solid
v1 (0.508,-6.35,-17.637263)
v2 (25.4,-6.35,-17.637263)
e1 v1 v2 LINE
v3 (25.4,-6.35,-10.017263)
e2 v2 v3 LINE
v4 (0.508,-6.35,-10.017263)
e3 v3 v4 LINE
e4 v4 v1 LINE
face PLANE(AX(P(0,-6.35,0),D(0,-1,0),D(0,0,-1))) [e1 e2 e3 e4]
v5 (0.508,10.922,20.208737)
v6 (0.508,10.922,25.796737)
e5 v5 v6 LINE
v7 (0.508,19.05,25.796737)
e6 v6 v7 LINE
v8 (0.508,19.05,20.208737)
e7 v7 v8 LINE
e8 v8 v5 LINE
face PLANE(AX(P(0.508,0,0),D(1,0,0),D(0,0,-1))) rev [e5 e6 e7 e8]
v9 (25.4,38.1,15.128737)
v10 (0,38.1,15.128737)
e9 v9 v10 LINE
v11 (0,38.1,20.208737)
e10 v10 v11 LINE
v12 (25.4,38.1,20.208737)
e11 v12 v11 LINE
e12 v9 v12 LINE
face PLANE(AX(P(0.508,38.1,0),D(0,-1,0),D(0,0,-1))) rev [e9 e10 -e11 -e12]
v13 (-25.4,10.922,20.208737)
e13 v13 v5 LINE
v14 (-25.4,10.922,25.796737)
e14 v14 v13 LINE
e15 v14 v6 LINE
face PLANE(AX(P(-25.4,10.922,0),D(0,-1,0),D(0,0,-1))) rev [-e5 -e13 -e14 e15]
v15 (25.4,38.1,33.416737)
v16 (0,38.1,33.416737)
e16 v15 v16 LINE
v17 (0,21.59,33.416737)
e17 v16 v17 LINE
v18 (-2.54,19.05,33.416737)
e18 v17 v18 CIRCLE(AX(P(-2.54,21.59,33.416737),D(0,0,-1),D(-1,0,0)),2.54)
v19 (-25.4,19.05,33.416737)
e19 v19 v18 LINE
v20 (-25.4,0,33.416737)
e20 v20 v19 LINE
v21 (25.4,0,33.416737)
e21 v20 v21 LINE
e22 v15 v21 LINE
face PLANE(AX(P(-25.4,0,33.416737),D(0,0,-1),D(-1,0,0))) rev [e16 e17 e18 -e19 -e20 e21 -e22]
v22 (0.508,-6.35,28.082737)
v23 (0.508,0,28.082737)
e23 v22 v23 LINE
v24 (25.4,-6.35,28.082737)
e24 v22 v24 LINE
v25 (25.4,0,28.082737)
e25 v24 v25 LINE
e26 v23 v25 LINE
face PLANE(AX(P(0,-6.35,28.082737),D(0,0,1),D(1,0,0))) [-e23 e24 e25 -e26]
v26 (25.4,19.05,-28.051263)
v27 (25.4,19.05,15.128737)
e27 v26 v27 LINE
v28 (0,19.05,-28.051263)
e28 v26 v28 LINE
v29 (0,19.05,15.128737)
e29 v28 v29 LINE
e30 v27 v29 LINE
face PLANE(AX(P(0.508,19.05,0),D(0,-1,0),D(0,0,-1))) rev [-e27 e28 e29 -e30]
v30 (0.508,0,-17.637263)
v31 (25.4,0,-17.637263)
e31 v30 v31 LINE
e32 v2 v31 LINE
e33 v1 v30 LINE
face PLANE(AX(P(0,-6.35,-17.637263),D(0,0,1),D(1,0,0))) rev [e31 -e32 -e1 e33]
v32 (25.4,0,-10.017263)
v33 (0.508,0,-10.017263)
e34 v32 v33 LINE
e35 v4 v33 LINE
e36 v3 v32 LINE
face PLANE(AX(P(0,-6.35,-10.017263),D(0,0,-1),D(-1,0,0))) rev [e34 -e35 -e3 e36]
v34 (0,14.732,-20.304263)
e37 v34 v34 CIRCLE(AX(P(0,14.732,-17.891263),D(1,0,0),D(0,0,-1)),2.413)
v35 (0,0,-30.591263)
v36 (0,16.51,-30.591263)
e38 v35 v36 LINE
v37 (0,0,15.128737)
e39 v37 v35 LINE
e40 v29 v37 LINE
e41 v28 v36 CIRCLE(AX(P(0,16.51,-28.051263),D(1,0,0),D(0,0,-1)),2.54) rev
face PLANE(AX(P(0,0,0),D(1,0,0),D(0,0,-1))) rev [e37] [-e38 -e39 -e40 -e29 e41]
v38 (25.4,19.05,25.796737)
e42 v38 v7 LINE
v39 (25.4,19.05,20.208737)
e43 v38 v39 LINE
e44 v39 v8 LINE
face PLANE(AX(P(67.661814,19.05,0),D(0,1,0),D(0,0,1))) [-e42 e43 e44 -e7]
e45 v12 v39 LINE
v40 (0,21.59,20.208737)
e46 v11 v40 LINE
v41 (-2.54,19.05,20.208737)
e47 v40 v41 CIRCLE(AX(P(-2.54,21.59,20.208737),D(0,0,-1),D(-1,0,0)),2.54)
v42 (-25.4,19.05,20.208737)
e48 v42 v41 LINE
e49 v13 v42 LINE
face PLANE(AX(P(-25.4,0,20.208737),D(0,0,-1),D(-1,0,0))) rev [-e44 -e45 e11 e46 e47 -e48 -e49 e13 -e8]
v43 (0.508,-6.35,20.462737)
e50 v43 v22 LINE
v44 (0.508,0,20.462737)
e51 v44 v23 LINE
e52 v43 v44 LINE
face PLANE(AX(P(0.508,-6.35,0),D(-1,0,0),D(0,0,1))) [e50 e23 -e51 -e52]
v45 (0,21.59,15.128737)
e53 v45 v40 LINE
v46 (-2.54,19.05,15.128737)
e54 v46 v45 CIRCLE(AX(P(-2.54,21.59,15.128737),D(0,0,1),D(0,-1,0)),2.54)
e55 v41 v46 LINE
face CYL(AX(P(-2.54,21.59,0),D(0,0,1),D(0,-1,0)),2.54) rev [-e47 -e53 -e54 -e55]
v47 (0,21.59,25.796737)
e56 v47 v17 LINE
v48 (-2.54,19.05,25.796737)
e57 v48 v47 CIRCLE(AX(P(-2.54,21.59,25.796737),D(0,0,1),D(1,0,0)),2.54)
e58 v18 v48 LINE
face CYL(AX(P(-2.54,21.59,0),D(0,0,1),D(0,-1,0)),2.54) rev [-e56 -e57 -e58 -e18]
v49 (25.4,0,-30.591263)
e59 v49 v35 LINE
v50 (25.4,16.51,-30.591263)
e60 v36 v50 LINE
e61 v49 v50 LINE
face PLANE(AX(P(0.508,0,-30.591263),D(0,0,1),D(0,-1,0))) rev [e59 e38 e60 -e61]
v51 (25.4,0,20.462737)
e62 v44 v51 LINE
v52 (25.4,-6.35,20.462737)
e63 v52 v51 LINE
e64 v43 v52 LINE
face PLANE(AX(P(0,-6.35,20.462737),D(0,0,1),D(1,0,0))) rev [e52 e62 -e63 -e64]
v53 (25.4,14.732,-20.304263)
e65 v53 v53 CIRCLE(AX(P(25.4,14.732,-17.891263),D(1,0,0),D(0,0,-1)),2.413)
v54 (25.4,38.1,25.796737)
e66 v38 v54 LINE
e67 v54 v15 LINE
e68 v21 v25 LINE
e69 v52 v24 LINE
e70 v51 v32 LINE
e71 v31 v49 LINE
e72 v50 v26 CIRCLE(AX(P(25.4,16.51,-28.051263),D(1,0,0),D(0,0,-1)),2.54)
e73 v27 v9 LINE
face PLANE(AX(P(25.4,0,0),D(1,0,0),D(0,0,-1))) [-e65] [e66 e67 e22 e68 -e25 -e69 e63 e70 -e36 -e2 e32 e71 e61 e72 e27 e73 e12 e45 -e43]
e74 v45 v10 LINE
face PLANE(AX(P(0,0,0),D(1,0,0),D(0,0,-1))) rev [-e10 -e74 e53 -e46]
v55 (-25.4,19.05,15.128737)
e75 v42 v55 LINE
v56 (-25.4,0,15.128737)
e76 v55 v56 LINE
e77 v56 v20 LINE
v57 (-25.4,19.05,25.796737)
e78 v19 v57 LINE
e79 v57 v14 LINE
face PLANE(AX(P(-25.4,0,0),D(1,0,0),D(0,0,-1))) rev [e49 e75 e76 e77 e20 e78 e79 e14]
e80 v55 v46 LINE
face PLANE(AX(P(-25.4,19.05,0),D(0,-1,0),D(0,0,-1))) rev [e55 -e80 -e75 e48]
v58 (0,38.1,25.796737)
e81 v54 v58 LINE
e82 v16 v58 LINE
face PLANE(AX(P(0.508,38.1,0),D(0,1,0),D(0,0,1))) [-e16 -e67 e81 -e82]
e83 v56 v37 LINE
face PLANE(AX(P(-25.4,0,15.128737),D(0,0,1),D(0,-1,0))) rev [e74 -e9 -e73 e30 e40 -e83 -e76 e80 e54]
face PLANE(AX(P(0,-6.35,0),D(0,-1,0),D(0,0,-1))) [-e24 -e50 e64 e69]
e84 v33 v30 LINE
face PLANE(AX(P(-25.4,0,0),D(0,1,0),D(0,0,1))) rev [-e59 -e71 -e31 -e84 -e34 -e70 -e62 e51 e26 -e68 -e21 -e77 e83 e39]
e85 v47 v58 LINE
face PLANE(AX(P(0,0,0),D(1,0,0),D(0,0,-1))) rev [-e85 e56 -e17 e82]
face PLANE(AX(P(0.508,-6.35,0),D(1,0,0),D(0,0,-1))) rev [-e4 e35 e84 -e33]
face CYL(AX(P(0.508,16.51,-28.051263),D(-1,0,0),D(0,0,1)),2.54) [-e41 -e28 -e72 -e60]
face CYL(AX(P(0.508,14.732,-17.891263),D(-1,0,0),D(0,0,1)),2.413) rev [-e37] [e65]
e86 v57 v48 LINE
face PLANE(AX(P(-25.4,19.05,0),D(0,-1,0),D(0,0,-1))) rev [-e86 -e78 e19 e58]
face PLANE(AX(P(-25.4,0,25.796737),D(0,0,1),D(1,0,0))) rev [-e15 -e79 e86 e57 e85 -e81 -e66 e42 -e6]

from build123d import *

# Parameters (mm, degrees)
SKETCH1_W           = 5.08
SKETCH1_H           = 8.128
BOSS_EXTRUDE1_DEPTH = 25.4
SKETCH2_W           = 5.08
SKETCH2_H           = 19.05
SKETCH2_W_2         = 7.62
SKETCH2_W_3         = 45.72
SKETCH2_R           = 2.413
BOSS_EXTRUDE2_DEPTH = 0.508
SKETCH2_3_W         = 45.72
SKETCH2_3_H         = 19.05
SKETCH2_3_R         = 2.413
BOSS_EXTRUDE3_DEPTH = 25.4
SKETCH3_W           = 5.588
SKETCH3_H           = 8.128
BOSS_EXTRUDE6_DEPTH = 24.892
FILLET1_R           = 2.54
FILLET2_R           = 2.54
BOSS_EXTRUDE7_DEPTH = 6.35


with BuildPart() as part:
    # Sketch1 → Boss-Extrude1 (new body)
    with BuildSketch(Plane(origin=(0, 0, 0), x_dir=(0, 0, -1), z_dir=(1, 0, 0))):
        Polygon((-33.416737041, 19.05), (-33.416737041, 0), (-15.128737041, 0), (-15.128737041, 10.922), (-20.208737041, 10.922), (-25.796737041, 10.922), (-25.796737041, 19.05), align=None)
        with Locations((-17.668737041, 14.986)):
            Rectangle(SKETCH1_W, SKETCH1_H)
    extrude(amount=-BOSS_EXTRUDE1_DEPTH)

    # Sketch2 → Boss-Extrude2 (add)
    # profile 1 of 4: a face of its own
    with BuildSketch(Plane(origin=(0, 0, 0), x_dir=(0, 0, -1), z_dir=(1, 0, 0))):
        Polygon((-33.416737041, 0), (-15.128737041, 0), (-15.128737041, 19.05), (-20.208737041, 19.05), (-20.208737041, 10.922), (-25.796737041, 10.922), (-25.796737041, 19.05), (-33.416737041, 19.05), align=None)
    # profile 2 of 4: a face of its own
    with BuildSketch(Plane(origin=(0, 0, 0), x_dir=(0, 0, -1), z_dir=(1, 0, 0))):
        with Locations((-17.668737041, 28.575)):
            Rectangle(SKETCH2_W, SKETCH2_H)
    # profile 3 of 4: a face of its own
    with BuildSketch(Plane(origin=(0, 0, 0), x_dir=(0, 0, -1), z_dir=(1, 0, 0))):
        with Locations((-29.606737041, 28.575)):
            Rectangle(SKETCH2_W_2, SKETCH2_H)
    # profile 4 of 4: a face of its own
    with BuildSketch(Plane(origin=(0, 0, 0), x_dir=(0, 0, -1), z_dir=(1, 0, 0))):
        with Locations((7.731262959, 9.525)):
            Rectangle(SKETCH2_W_3, SKETCH2_H)
        with Locations((17.891262959, 14.732)):
            Circle(SKETCH2_R, mode=Mode.SUBTRACT)
    extrude(amount=BOSS_EXTRUDE2_DEPTH)

    # Sketch2<3> → Boss-Extrude3 (add)
    with BuildSketch(Plane(origin=(0, 0, 0), x_dir=(0, 0, -1), z_dir=(1, 0, 0))):
        with Locations((7.731262959, 9.525)):
            Rectangle(SKETCH2_3_W, SKETCH2_3_H)
        with Locations((17.891262959, 14.732)):
            Circle(SKETCH2_3_R, mode=Mode.SUBTRACT)
    extrude(amount=BOSS_EXTRUDE3_DEPTH)

    # Sketch3 → Boss-Extrude6 (add)
    with BuildSketch(Plane(origin=(0.508, 0, 0), x_dir=(0, 0, -1), z_dir=(1, 0, 0))):
        Polygon((-33.416737041, 0), (-15.128737041, 0), (-15.128737041, 19.05), (-15.128737041, 38.1), (-20.208737041, 38.1), (-20.208737041, 10.922), (-25.796737041, 10.922), (-25.796737041, 38.1), (-33.416737041, 38.1), align=None)
        with Locations((-23.002737041, 14.986)):
            Rectangle(SKETCH3_W, SKETCH3_H)
    extrude(amount=BOSS_EXTRUDE6_DEPTH)

    # Fillet1
    # the kernel refuses this fillet: 2.54 mm, written as the material it adds along each edge
    with BuildSketch(Plane(origin=(0, 19.05, 19.446737041), x_dir=(0, 1, 0), z_dir=(0, 0, 1))) as fillet1_piece_1_section:
        with BuildLine():
            CenterArc((FILLET1_R, FILLET1_R), FILLET1_R, 180, 90)
            Line((0, FILLET1_R), (0, 0))
            Line((0, 0), (FILLET1_R, 0))
        make_face()
    fillet1_piece_1 = extrude(amount=13.97, mode=Mode.PRIVATE)
    fillet1_piece_1 = split(fillet1_piece_1, bisect_by=Plane(origin=(-0.57504359, 19.62504359, 20.208737041), z_dir=(0, 0, -1)), keep=Keep.TOP, mode=Mode.PRIVATE)
    add(fillet1_piece_1)
    with BuildSketch(Plane(origin=(0, 19.05, 25.796737041), x_dir=(0, 1, 0), z_dir=(0, 0, 1))) as fillet1_piece_2:
        with BuildLine():
            CenterArc((FILLET1_R, FILLET1_R), FILLET1_R, 180, 90)
            Line((0, FILLET1_R), (0, 0))
            Line((0, 0), (FILLET1_R, 0))
        make_face()
    extrude(amount=7.62)
    with BuildSketch(Plane(origin=(0, 19.05, 15.128737041), x_dir=(0, 1, 0), z_dir=(0, 0, 1))) as fillet1_piece_3:
        with BuildLine():
            CenterArc((FILLET1_R, FILLET1_R), FILLET1_R, 180, 90)
            Line((0, FILLET1_R), (0, 0))
            Line((0, 0), (FILLET1_R, 0))
        make_face()
    extrude(amount=5.08)
    with BuildSketch(Plane(origin=(0, 19.05, 15.128737041), x_dir=(0, 1, 0), z_dir=(0, 0, 1))) as fillet1_piece_4_section:
        with BuildLine():
            CenterArc((FILLET1_R, FILLET1_R), FILLET1_R, 180, 90)
            Line((0, FILLET1_R), (0, 0))
            Line((0, 0), (FILLET1_R, 0))
        make_face()
    fillet1_piece_4 = extrude(amount=11.43, mode=Mode.PRIVATE)
    fillet1_piece_4 = split(fillet1_piece_4, bisect_by=Plane(origin=(-0.57504359, 19.62504359, 25.796737041), z_dir=(0, 0, 1)), keep=Keep.TOP, mode=Mode.PRIVATE)
    add(fillet1_piece_4)

    # Fillet2
    fillet2_edges = [part.edges().sort_by_distance(p)[0] for p in [
        (12.7, 19.05, -30.591262959),
    ]]
    fillet(fillet2_edges, radius=FILLET2_R)

    # Sketch4 → Boss-Extrude7 (add)
    with BuildSketch(Plane.XZ):
        Polygon((0.508, 28.082737041), (0.508, 24.272737041), (0.508, 20.462737041), (25.4, 20.462737041), (25.4, 24.272737041), (25.4, 28.082737041), align=None)
        Polygon((25.4, -13.827262959), (25.4, -10.017262959), (0.508, -10.017262959), (0.508, -17.637262959), (25.4, -17.637262959), align=None)
    extrude(amount=BOSS_EXTRUDE7_DEPTH)


solid = part.part
